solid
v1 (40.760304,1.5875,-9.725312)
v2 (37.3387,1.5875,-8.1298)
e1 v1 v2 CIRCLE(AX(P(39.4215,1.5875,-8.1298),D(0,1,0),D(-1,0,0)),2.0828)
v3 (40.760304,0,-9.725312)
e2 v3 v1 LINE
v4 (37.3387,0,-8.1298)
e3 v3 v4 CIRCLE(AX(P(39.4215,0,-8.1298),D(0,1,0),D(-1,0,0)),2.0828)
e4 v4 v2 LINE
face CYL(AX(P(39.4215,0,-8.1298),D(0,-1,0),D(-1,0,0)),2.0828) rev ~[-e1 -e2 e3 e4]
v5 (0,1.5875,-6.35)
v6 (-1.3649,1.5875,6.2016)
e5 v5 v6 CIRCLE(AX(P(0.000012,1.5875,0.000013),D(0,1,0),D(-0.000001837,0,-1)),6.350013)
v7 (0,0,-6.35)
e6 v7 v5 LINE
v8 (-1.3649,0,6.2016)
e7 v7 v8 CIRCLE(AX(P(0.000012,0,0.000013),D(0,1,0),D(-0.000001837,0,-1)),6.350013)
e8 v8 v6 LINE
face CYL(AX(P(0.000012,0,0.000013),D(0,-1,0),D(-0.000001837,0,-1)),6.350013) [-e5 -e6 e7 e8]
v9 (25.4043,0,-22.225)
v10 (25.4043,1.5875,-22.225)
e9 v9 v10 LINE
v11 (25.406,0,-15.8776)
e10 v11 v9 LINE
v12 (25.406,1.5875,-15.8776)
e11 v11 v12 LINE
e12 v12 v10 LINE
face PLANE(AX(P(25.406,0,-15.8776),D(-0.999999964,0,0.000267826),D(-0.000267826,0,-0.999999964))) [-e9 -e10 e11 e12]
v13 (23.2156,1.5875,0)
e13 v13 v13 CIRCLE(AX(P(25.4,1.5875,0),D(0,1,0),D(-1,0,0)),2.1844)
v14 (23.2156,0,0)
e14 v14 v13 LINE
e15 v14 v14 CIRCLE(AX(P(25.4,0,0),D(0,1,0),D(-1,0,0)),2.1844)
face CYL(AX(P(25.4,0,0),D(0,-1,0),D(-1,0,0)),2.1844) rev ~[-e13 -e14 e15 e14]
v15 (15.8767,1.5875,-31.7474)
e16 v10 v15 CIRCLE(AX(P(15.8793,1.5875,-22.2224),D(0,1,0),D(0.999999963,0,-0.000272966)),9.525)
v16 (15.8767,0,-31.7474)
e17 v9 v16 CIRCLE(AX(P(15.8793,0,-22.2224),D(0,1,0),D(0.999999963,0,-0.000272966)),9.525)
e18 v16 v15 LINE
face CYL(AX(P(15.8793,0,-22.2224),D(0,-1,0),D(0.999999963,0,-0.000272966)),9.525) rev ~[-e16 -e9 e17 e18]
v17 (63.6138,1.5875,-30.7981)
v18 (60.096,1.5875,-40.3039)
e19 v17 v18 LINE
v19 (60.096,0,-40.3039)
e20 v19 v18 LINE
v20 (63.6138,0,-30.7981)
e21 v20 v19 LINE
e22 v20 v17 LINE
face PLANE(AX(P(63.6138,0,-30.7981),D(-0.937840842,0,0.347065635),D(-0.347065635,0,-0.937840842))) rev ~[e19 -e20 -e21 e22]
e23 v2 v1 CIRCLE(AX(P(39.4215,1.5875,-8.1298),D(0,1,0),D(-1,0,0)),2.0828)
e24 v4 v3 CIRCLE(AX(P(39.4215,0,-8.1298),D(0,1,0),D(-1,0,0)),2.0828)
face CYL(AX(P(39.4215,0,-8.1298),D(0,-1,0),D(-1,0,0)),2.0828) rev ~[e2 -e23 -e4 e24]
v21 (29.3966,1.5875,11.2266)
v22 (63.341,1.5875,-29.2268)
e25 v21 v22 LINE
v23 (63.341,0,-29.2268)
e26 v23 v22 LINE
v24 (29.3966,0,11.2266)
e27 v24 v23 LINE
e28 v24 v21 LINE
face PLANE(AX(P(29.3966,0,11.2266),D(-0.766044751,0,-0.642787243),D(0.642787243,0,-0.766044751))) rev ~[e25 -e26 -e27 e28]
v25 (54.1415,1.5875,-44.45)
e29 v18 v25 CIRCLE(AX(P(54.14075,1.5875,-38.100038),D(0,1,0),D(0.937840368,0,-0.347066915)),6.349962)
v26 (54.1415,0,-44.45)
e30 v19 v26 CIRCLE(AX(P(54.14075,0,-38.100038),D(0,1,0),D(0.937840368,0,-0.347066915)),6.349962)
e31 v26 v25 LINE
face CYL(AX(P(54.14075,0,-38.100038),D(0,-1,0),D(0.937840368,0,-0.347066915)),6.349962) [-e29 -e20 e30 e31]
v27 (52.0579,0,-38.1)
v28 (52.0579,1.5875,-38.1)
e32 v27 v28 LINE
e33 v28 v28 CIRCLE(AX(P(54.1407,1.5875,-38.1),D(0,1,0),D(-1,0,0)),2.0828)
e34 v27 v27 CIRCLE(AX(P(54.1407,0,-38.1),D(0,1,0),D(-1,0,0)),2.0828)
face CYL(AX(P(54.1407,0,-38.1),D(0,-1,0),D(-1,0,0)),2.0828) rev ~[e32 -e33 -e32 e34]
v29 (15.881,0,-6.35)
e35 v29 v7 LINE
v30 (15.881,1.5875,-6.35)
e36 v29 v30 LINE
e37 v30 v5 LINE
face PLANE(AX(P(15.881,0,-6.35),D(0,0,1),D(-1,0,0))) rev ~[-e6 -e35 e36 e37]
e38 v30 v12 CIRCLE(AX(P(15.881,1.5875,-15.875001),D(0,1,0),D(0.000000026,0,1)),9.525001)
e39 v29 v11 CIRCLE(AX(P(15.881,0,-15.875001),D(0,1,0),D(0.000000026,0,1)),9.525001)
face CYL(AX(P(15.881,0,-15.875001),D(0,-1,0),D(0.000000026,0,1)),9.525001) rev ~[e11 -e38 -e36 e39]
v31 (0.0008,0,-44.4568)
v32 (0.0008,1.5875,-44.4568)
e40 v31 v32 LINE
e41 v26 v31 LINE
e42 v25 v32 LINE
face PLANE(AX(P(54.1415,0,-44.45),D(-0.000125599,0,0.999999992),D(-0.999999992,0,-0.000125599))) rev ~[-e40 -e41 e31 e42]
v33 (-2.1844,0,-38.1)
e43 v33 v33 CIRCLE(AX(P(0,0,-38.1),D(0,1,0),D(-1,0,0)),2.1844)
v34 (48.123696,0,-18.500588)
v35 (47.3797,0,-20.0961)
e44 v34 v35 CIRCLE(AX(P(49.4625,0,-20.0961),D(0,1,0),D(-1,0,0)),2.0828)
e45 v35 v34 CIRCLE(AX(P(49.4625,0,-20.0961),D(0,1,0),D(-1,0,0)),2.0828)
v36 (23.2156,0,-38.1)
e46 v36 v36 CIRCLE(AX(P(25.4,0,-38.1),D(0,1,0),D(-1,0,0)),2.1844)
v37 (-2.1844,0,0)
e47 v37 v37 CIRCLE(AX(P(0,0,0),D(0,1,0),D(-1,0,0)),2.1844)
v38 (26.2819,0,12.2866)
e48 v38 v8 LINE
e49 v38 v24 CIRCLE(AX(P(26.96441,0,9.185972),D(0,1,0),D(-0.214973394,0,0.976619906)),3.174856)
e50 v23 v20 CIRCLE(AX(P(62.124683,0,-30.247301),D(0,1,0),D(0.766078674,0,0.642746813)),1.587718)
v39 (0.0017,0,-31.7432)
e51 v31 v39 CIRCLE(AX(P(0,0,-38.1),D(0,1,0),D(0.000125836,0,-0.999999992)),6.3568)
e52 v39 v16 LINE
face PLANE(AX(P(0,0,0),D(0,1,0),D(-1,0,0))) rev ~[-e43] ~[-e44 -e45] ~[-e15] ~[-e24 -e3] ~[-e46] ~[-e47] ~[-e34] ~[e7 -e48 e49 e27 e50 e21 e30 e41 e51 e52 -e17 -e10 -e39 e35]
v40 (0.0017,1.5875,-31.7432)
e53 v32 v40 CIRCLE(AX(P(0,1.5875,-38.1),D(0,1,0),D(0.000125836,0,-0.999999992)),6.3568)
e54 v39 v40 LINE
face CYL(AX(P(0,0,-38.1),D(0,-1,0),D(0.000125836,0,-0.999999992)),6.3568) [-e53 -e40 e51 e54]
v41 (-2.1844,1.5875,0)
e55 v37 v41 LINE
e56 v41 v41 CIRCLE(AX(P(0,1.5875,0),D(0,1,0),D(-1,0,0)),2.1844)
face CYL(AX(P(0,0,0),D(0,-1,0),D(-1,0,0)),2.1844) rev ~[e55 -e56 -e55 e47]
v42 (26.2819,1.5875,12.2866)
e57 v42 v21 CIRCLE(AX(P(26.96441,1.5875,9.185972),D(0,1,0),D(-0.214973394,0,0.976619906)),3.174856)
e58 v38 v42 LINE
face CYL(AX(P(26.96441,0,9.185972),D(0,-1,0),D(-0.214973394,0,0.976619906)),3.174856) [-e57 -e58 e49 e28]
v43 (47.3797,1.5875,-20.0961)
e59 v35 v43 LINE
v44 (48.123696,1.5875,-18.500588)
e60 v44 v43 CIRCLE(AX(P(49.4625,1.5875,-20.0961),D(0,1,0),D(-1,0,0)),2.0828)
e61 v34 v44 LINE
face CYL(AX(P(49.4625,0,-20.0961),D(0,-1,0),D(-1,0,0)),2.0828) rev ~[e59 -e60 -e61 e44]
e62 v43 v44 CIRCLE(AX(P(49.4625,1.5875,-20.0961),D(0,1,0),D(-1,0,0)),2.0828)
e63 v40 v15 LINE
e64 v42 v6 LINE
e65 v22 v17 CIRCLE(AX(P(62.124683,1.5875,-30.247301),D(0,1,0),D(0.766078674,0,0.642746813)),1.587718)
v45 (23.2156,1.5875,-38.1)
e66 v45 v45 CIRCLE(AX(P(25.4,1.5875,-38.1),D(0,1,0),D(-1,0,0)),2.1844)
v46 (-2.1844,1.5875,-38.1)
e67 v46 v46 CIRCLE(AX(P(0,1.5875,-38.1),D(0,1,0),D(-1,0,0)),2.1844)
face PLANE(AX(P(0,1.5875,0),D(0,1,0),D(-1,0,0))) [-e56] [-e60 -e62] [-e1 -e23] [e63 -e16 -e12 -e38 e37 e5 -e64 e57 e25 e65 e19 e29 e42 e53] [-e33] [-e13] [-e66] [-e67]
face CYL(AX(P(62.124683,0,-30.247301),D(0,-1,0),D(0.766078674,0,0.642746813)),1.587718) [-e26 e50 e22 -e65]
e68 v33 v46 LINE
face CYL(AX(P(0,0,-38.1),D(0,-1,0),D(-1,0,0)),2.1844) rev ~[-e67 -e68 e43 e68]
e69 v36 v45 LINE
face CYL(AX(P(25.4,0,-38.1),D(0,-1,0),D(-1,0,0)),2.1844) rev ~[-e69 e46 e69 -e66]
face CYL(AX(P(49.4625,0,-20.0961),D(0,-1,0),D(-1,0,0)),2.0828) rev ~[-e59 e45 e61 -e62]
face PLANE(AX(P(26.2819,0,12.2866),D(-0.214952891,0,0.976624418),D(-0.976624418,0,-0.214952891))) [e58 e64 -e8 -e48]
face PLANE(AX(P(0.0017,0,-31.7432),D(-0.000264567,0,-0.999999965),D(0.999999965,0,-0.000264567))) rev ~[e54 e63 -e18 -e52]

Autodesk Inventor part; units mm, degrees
ref_plane "YZ Plane" through (0, 0, 0) normal (1, 0, 0) x (0, 1, 0)
ref_plane "XZ Plane" through (0, 0, 0) normal (0, 1, 0) x (-1, 0, 0)
ref_plane "XY Plane" through (0, 0, 0) normal (0, 0, 1) x (1, 0, 0)
sketch "main" plane through (0, 0, 0) normal (0, 0, 1) x (1, 0, 0)
  circle A0 centre (-18.8876, -3.9215) radius 2.0828
  arc A1 (-24.8429, -6.1253) -> (-18.8884, -10.2715) centre (-18.8876, -3.9215) ccw
  line L0 (5.8565, 45.4052) -> (-28.0879, 4.9518)
  circle A2 centre (9.8531, -3.9215) radius 2.1844
  line L1 (-18.8884, -10.2715) -> (35.2523, -10.2783)
  line L2 (9.8472, 18.301) -> (9.8489, 11.9535)
  arc A3 (9.8489, 11.9535) -> (19.3764, 2.4311) centre (19.3739, 11.9561) ccw
  circle A4 centre (9.8531, 34.1785) radius 2.1844
  line L3 (35.2514, 2.4354) -> (19.3764, 2.4311)
  arc A5 (35.2523, -10.2783) -> (35.2514, 2.4354) centre (35.2531, -3.9215) ccw
  circle A6 centre (35.2531, 34.1785) radius 2.1844
  arc A7 (35.2531, 27.8285) -> (36.6181, 40.3801) centre (35.2531, 34.1785) ccw
  circle A8 centre (35.2531, -3.9215) radius 2.1844
  line L4 (-28.3606, 3.3804) -> (-24.8429, -6.1253)
  line L5 (19.3722, 27.8285) -> (35.2531, 27.8285)
  arc A9 (19.3722, 27.8285) -> (9.8472, 18.301) centre (19.3722, 18.3035) ccw
  circle A10 centre (-14.2094, 14.0824) radius 2.0828
  arc A11 (-28.0879, 4.9518) -> (-28.3606, 3.3804) centre (-26.8718, 3.9314) ccw
  circle A12 centre (-4.1684, 26.0488) radius 2.0828
  line L6 (-4.1684, 26.0488) -> (-14.2094, 14.0824)
  line L7 (8.9712, 46.4651) -> (36.6181, 40.3801)
  arc A13 (8.9712, 46.4651) -> (5.8565, 45.4052) centre (8.2887, 43.3643) ccw
  point P0 (9.379, 13.4106)
  point P1 (9.8514, 2.4285)
  point P2 (9.8446, 27.8285)
  dimension "d0" = 4.1656
  dimension "d1" = 12.7
  dimension "d6" = 9.525
  dimension "d8" = 4.1656
  dimension "d9" = 1.5875
  dimension "d14" = 4.1656
  dimension "d15" = 15.621
  dimension "d17" = 3.175
sketch "Sketch1" plane through (0, 0, 0) normal (0, 1, 0) x (-1, 0, 0)
  circle A0 centre (-54.1407, -38.1) radius 2.0828
  arc A1 (-60.096, -40.3039) -> (-54.1415, -44.45) centre (-54.1407, -38.1) ccw
  line L0 (-29.3966, 11.2266) -> (-63.341, -29.2268)
  circle A2 centre (-25.4, -38.1) radius 2.1844
  line L1 (-54.1415, -44.45) -> (-0.0008, -44.4568)
  line L2 (-25.406, -15.8776) -> (-25.4043, -22.225)
  arc A3 (-25.4043, -22.225) -> (-15.8767, -31.7474) centre (-15.8793, -22.2224) ccw
  circle A4 centre (-25.4, 0) radius 2.1844
  line L3 (-0.0017, -31.7432) -> (-15.8767, -31.7474)
  arc A5 (-0.0008, -44.4568) -> (-0.0017, -31.7432) centre (0, -38.1) ccw
  circle A6 centre (0, 0) radius 2.1844
  arc A7 (0, -6.35) -> (1.3649, 6.2016) centre (0, 0) ccw
  circle A8 centre (0, -38.1) radius 2.1844
  line L4 (-63.6138, -30.7981) -> (-60.096, -40.3039)
  line L5 (-15.881, -6.35) -> (0, -6.35)
  arc A9 (-15.881, -6.35) -> (-25.406, -15.8776) centre (-15.881, -15.875) ccw
  circle A10 centre (-49.4625, -20.0961) radius 2.0828
  arc A11 (-63.341, -29.2268) -> (-63.6138, -30.7981) centre (-62.1249, -30.2472) ccw
  circle A12 centre (-39.4215, -8.1298) radius 2.0828
  line L6 (-39.4215, -8.1298) -> (-49.4625, -20.0961)
  line L7 (-26.2819, 12.2866) -> (1.3649, 6.2016)
  arc A13 (-26.2819, 12.2866) -> (-29.3966, 11.2266) centre (-26.9644, 9.1858) ccw
extrude "Extrusion1" add sketch "Sketch1" along normal blind 1.5875
properties part number "funel_gusset" material "Acetal Resin, White"
